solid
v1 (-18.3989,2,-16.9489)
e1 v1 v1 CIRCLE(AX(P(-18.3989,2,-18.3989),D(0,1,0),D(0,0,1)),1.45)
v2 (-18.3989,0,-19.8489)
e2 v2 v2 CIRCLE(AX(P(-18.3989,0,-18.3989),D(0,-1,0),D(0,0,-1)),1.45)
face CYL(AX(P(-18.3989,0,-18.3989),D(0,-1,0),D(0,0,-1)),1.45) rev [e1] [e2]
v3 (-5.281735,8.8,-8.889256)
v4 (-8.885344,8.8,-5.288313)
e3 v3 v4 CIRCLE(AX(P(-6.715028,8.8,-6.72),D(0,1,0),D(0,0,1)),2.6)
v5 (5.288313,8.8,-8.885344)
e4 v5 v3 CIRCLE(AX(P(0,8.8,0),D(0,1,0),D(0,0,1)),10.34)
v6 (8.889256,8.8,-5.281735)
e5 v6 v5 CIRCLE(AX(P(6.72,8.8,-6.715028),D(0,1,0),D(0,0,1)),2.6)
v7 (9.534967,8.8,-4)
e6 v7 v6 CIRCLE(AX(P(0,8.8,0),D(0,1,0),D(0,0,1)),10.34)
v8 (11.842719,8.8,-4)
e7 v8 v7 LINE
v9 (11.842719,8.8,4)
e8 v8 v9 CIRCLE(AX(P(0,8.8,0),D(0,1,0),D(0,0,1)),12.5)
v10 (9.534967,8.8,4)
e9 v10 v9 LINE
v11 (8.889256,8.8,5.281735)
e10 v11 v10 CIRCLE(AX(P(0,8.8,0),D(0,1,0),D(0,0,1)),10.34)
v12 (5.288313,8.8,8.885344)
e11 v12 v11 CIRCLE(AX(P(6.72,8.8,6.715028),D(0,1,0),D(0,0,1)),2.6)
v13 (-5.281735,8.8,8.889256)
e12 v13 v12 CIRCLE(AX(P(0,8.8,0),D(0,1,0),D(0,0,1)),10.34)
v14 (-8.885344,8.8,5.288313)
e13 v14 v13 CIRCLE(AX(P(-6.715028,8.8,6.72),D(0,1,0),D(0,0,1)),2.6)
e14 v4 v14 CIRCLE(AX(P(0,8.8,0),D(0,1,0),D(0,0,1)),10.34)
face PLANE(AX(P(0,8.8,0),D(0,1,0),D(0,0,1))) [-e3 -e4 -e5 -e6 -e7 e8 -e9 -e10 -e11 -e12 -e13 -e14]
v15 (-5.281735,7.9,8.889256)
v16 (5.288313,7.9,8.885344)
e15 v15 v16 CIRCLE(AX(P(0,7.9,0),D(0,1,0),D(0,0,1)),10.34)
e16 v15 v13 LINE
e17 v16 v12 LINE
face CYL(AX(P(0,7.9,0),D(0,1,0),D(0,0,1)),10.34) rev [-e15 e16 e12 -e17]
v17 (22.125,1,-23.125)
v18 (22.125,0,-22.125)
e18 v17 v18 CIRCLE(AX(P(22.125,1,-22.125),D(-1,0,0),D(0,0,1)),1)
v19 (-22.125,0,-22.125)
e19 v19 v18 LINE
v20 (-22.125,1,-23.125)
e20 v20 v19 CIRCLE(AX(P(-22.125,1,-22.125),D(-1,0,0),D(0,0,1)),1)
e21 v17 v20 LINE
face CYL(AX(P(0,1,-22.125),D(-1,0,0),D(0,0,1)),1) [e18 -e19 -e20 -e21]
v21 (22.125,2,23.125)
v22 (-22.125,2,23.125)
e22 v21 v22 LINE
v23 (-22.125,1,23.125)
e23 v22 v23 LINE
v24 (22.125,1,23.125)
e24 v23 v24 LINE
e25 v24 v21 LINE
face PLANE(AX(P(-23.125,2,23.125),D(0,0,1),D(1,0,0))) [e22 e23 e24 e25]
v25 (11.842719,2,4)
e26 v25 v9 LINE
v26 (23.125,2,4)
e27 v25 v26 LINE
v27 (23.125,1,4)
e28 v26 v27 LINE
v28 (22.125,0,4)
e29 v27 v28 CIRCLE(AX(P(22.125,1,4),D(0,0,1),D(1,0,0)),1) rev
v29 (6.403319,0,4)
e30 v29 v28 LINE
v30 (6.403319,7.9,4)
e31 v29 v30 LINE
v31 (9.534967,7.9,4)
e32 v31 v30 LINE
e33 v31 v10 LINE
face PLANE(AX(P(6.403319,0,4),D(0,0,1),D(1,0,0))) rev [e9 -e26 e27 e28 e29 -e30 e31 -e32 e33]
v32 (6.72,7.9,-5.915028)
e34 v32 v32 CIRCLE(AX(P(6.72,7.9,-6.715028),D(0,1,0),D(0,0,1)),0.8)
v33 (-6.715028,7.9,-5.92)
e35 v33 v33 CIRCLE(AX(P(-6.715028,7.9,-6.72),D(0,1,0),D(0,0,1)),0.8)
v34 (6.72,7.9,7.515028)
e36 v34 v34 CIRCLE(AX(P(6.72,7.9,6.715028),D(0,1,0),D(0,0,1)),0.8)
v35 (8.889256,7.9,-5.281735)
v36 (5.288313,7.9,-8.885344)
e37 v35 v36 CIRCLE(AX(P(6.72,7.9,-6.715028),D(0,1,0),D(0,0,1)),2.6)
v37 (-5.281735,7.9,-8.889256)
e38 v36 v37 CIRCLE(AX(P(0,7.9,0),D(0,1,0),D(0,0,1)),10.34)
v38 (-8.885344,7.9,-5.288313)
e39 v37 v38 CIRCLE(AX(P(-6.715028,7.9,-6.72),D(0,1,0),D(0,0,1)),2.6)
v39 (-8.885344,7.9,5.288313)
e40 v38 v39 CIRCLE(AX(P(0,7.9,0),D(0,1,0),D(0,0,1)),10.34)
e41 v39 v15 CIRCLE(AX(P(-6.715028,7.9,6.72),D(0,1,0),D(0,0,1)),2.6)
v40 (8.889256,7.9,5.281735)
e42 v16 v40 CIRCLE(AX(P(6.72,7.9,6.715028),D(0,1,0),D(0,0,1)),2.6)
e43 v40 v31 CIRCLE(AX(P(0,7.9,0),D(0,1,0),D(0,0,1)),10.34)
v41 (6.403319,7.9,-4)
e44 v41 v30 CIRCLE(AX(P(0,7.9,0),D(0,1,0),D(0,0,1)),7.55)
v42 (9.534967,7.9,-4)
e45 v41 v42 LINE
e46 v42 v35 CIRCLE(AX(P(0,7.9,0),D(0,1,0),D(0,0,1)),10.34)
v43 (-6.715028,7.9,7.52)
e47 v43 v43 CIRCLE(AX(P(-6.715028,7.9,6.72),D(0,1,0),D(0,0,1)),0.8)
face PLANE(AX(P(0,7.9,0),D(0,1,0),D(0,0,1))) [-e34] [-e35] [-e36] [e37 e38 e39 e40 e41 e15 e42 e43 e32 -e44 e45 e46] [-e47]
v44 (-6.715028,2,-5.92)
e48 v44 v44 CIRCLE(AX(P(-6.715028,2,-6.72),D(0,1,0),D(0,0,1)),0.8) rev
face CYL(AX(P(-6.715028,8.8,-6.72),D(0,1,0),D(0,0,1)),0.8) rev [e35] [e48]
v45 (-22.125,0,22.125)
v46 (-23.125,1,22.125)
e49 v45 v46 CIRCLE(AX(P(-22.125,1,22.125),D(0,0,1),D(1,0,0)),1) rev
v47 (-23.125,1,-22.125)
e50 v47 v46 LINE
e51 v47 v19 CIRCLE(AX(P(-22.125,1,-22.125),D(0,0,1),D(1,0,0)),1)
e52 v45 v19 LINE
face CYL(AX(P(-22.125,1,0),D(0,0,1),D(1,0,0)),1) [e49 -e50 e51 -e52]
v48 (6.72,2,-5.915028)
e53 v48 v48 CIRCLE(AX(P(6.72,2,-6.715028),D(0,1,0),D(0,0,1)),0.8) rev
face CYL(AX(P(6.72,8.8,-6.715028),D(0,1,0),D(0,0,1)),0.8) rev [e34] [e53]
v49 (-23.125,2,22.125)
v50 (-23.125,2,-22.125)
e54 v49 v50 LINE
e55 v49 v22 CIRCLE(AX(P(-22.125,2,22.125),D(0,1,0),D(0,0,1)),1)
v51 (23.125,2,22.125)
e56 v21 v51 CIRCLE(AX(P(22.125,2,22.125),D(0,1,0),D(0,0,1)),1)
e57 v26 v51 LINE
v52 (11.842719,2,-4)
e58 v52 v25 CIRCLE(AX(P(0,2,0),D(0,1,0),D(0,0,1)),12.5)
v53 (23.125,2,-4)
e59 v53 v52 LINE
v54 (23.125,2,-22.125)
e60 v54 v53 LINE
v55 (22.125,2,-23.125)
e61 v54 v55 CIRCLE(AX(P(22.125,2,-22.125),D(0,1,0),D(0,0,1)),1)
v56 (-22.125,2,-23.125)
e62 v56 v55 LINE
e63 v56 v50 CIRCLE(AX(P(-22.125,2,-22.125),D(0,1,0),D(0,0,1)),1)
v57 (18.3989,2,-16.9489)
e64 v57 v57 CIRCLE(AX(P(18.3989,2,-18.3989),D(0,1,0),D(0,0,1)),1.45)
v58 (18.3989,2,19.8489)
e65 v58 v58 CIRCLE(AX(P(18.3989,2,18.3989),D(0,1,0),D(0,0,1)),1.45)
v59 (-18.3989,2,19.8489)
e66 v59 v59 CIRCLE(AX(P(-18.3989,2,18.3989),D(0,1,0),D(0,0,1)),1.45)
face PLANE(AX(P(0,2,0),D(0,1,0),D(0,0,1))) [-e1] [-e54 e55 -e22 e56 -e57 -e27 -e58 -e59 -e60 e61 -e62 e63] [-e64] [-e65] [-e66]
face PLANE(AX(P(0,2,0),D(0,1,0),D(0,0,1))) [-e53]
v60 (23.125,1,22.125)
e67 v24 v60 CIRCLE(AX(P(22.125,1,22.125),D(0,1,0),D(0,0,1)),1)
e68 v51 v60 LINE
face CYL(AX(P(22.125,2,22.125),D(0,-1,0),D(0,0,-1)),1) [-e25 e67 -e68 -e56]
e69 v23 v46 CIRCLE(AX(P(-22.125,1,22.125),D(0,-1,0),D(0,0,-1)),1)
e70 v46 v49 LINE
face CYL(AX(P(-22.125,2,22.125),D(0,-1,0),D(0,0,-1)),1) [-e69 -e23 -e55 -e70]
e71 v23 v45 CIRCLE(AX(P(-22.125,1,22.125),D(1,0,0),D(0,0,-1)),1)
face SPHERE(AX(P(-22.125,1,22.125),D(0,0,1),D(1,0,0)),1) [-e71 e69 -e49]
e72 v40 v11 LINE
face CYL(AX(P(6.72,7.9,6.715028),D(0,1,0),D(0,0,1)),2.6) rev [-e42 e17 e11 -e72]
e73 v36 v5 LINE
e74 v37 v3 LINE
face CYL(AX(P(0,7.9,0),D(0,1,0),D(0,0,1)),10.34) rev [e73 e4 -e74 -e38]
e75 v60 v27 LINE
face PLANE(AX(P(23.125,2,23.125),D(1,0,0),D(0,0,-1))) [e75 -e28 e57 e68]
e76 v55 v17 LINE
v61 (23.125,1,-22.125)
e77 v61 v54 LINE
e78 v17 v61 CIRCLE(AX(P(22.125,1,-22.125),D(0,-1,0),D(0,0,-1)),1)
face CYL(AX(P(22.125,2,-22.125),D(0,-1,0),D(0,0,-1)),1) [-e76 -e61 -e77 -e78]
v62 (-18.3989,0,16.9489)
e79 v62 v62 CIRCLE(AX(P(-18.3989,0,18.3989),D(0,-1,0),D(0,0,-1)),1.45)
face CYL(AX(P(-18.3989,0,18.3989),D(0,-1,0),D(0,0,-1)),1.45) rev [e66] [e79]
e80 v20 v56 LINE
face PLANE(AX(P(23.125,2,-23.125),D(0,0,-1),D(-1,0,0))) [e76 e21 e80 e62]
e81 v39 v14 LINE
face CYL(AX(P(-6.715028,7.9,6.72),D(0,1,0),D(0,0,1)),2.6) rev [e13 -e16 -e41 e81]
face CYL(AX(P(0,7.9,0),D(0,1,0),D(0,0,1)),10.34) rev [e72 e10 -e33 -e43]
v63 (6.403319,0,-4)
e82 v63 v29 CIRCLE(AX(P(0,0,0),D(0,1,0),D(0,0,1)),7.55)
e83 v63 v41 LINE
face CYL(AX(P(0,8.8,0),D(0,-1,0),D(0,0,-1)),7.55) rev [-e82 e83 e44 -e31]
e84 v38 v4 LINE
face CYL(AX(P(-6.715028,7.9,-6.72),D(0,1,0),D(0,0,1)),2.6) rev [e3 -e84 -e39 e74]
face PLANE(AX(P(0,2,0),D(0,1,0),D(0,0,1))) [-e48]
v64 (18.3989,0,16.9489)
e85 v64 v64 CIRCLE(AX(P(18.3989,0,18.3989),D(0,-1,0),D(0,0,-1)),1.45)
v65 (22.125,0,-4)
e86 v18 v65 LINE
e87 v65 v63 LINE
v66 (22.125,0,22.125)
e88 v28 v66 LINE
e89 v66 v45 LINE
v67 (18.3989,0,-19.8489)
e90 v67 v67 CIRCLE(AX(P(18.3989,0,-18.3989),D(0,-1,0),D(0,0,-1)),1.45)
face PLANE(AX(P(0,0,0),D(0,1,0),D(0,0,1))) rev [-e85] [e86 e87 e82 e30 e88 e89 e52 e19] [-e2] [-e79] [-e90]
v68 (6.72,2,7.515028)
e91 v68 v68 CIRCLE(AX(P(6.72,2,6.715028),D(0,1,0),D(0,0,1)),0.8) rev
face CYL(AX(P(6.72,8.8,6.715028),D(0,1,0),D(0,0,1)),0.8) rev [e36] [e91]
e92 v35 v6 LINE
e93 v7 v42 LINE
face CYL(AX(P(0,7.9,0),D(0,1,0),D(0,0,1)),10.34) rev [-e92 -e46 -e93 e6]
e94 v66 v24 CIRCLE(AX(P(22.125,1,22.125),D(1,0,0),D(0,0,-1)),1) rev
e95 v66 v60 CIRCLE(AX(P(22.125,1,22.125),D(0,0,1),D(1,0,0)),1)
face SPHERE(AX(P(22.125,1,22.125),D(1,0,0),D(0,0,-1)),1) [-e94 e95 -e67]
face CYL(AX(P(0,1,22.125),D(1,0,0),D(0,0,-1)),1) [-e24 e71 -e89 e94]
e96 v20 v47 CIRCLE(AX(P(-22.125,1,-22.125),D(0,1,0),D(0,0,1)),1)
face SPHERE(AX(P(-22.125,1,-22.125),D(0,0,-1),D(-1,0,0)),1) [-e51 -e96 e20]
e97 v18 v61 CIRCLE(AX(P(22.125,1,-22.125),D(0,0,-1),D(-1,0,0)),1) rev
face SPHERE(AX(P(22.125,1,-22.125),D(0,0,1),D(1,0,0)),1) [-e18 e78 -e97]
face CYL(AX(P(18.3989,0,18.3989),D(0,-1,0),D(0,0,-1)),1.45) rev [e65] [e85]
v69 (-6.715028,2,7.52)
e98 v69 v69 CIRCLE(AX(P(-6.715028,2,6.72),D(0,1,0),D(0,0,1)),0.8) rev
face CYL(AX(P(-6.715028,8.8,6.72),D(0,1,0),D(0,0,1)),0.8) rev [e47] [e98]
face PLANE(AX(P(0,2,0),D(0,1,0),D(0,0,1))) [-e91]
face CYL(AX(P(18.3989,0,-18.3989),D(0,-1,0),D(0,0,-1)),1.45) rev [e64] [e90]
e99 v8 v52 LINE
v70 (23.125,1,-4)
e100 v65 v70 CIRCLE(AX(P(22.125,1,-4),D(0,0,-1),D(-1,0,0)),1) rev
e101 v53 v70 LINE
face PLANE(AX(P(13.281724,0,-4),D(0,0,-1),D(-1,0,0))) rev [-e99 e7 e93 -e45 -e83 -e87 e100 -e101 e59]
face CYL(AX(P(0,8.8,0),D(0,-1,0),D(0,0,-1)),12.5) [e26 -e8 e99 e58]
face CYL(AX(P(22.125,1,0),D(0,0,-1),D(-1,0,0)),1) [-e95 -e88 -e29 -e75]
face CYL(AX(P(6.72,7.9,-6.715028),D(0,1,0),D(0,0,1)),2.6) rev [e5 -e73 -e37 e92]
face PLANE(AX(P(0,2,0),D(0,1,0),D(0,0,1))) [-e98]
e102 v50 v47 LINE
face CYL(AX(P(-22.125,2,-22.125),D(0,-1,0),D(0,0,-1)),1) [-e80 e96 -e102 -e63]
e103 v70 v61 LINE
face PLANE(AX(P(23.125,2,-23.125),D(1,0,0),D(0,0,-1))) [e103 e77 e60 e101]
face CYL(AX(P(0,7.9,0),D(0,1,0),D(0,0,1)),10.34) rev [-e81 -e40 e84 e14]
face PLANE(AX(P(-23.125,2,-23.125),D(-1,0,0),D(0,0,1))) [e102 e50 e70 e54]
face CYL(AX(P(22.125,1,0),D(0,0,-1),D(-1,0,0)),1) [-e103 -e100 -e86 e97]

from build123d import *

# Parameters (mm, degrees)
SKETCH3_R                   = 12.5
SKETCH3_R_2                 = 7.55
BOSS_EXTRUDE2_DEPTH         = 8.8
SKETCH4_W                   = 6.878404869
SKETCH4_H                   = 8
CUT_EXTRUDE2_DEPTH          = 8.8
SKETCH8_R                   = 10.34
CUT_EXTRUDE5_DEPTH          = 0.9
TAP_DRILL_FOR_M2X0_4_TAP1_D = 1.6
CUT_EXTRUDE6_DEPTH          = 0.9
BOSS_EXTRUDE4_DEPTH         = 2
FILLET2_R                   = 1
FILLET3_R                   = 1
M2_5_CLEARANCE_HOLE1_D      = 2.9
FILLET4_R                   = 1
FILLET5_R                   = 1


with BuildPart() as part:
    # Sketch3 → Boss-Extrude2 (new body)
    with BuildSketch(Plane(origin=(0, 0, 0), x_dir=(1, 0, 0), z_dir=(0, 1, 0))):
        with Locations(Location((0, 0, 0), (0, 0, 270))):
            Circle(SKETCH3_R)
        with Locations(Location((0, 0, 0), (0, 0, 270))):
            Circle(SKETCH3_R_2, mode=Mode.SUBTRACT)
    extrude(amount=BOSS_EXTRUDE2_DEPTH)

    # Sketch4 → Cut-Extrude2 (cut)
    with BuildSketch(Plane(origin=(0, 8.8, 0), x_dir=(1, 0, 0), z_dir=(0, 1, 0))):
        with Locations((9.842521887, 0)):
            Rectangle(SKETCH4_W, SKETCH4_H)
    extrude(amount=-CUT_EXTRUDE2_DEPTH, mode=Mode.SUBTRACT)

    # Sketch8 → Cut-Extrude5 (cut)
    with BuildSketch(Plane(origin=(0, 8.8, 0), x_dir=(1, 0, 0), z_dir=(0, 1, 0))):
        Circle(SKETCH8_R)
    extrude(amount=-CUT_EXTRUDE5_DEPTH, mode=Mode.SUBTRACT)

    # Tap Drill for M2x0.4 Tap1 (through all)
    with Locations(Plane(origin=(6.72, 8.8, 6.715027923), x_dir=(0, 0, 1), z_dir=(0, 1, 0))):
        with Locations((0, 0), (0.004972077, -13.435027923), (-13.435027923, -13.435027923), (-13.430055846, 0)):
            Hole(TAP_DRILL_FOR_M2X0_4_TAP1_D / 2)

    # Sketch11 → Cut-Extrude6 (cut)
    with BuildSketch(Plane(origin=(0, 8.8, 0), x_dir=(1, 0, 0), z_dir=(0, 1, 0))):
        with BuildLine():
            Line((8.889256072, 5.281735177), (5.288313257, 8.885344275))
            ThreePointArc((5.288313257, 8.885344275), (8.559157895, 8.552825038), (8.889256072, 5.281735177))
        make_face()
        with BuildLine():
            Line((8.889256072, -5.281735177), (5.288313257, -8.885344275))
            ThreePointArc((5.288313257, -8.885344275), (8.559157895, -8.552825038), (8.889256072, -5.281735177))
        make_face()
        with BuildLine():
            Line((-5.281735177, -8.889256072), (-8.885344275, -5.288313257))
            ThreePointArc((-8.885344275, -5.288313257), (-8.552825038, -8.559157895), (-5.281735177, -8.889256072))
        make_face()
        with BuildLine():
            Line((-5.281735177, 8.889256072), (-8.885344275, 5.288313257))
            ThreePointArc((-8.885344275, 5.288313257), (-8.552825038, 8.559157895), (-5.281735177, 8.889256072))
        make_face()
    extrude(amount=-CUT_EXTRUDE6_DEPTH, mode=Mode.SUBTRACT)

    # Sketch12 → Boss-Extrude4 (add)
    with BuildSketch(Plane.XZ):
        with BuildLine():
            Line((23.125, -23.125), (-23.125, -23.125))
            Line((-23.125, -23.125), (-23.125, 23.125))
            Line((-23.125, 23.125), (23.125, 23.125))
            Line((23.125, 23.125), (23.125, 4))
            Line((23.125, 4), (6.403319452, 4))
            ThreePointArc((6.403319452, 4), (-7.55, 0), (6.403319452, -4))
            Line((6.403319452, -4), (23.125, -4))
            Line((23.125, -4), (23.125, -23.125))
        make_face()
    extrude(amount=-BOSS_EXTRUDE4_DEPTH)

    # Fillet2
    fillet2_edges = [part.edges().sort_by_distance(p)[0] for p in [
        (0, 0, 23.125),
        (-23.125, 0, 0),
    ]]
    fillet(fillet2_edges, radius=FILLET2_R)

    # Fillet3
    # the kernel refuses this fillet: 1 mm, written as the material it takes off along each edge
    with BuildSketch(Plane(origin=(-22.125, 1, 22.125), x_dir=(0, 0, 1), z_dir=(-1, 0, 0))) as fillet3_piece_1_section:
        Polygon((0, 0), (FILLET3_R, 0), (FILLET3_R, -FILLET3_R), (0, -FILLET3_R), align=None)
    fillet3_piece_1 = extrude(amount=FILLET3_R, mode=Mode.PRIVATE)
    fillet3_piece_1 = fillet3_piece_1 - Plane(origin=(-22.125, 1, 22.125), x_dir=(0, 0.7071067811865475, -0.7071067811865475), z_dir=(-1, 0, 0)) * Sphere(FILLET3_R, mode=Mode.PRIVATE)
    add(fillet3_piece_1, mode=Mode.SUBTRACT)
    with BuildSketch(Plane(origin=(-23.125, 1, 23.125), x_dir=(0, 0, -1), z_dir=(0, 1, 0))) as fillet3_piece_2:
        with BuildLine():
            CenterArc((FILLET3_R, -FILLET3_R), FILLET3_R, 90, 90)
            Line((0, -FILLET3_R), (0, 0))
            Line((0, 0), (FILLET3_R, 0))
        make_face()
    extrude(amount=3.5, mode=Mode.SUBTRACT)

    # M2.5 Clearance Hole1 (through all)
    with Locations(Plane(origin=(18.3989, 0, 18.3989), x_dir=(0, 0, -1), z_dir=(0, -1, 0))):
        with Locations((0, 0), (36.7978, 0), (36.7978, -36.7978), (0, -36.7978)):
            Hole(M2_5_CLEARANCE_HOLE1_D / 2)

    # Fillet4
    fillet4_edges = [part.edges().sort_by_distance(p)[0] for p in [
        (23.125, 0, 13.0625),
        (23.125, 0, -13.5625),
        (-23.125, 1.5, -23.125),
        (23.125, 1.5, 23.125),
        (0.5, 0, -23.125),
        (-22.832106781, 0.292893219, -23.125),
        (23.125, 0.292893219, 22.832106781),
    ]]
    fillet(fillet4_edges, radius=FILLET4_R)

    # Fillet5
    # the kernel refuses this fillet: 1 mm, written as the material it takes off along each edge
    with BuildSketch(Plane(origin=(22.125, 1, -22.125), x_dir=(1, 0, 0), z_dir=(0, 0, -1))) as fillet5_piece_1_section:
        Polygon((0, 0), (FILLET5_R, 0), (FILLET5_R, FILLET5_R), (0, FILLET5_R), align=None)
    fillet5_piece_1 = extrude(amount=FILLET5_R, mode=Mode.PRIVATE)
    fillet5_piece_1 = fillet5_piece_1 - Plane(origin=(22.125, 1, -22.125), x_dir=(-0.7071067811865475, 0.7071067811865475, 0), z_dir=(0, 0, -1)) * Sphere(FILLET5_R, mode=Mode.PRIVATE)
    add(fillet5_piece_1, mode=Mode.SUBTRACT)
    with BuildSketch(Plane(origin=(23.125, 1, -23.125), x_dir=(-1, 0, 0), z_dir=(0, 1, 0))) as fillet5_piece_2:
        with BuildLine():
            CenterArc((FILLET5_R, FILLET5_R), FILLET5_R, 180, 90)
            Line((0, FILLET5_R), (0, 0))
            Line((0, 0), (FILLET5_R, 0))
        make_face()
    extrude(amount=3.5, mode=Mode.SUBTRACT)


solid = part.part
